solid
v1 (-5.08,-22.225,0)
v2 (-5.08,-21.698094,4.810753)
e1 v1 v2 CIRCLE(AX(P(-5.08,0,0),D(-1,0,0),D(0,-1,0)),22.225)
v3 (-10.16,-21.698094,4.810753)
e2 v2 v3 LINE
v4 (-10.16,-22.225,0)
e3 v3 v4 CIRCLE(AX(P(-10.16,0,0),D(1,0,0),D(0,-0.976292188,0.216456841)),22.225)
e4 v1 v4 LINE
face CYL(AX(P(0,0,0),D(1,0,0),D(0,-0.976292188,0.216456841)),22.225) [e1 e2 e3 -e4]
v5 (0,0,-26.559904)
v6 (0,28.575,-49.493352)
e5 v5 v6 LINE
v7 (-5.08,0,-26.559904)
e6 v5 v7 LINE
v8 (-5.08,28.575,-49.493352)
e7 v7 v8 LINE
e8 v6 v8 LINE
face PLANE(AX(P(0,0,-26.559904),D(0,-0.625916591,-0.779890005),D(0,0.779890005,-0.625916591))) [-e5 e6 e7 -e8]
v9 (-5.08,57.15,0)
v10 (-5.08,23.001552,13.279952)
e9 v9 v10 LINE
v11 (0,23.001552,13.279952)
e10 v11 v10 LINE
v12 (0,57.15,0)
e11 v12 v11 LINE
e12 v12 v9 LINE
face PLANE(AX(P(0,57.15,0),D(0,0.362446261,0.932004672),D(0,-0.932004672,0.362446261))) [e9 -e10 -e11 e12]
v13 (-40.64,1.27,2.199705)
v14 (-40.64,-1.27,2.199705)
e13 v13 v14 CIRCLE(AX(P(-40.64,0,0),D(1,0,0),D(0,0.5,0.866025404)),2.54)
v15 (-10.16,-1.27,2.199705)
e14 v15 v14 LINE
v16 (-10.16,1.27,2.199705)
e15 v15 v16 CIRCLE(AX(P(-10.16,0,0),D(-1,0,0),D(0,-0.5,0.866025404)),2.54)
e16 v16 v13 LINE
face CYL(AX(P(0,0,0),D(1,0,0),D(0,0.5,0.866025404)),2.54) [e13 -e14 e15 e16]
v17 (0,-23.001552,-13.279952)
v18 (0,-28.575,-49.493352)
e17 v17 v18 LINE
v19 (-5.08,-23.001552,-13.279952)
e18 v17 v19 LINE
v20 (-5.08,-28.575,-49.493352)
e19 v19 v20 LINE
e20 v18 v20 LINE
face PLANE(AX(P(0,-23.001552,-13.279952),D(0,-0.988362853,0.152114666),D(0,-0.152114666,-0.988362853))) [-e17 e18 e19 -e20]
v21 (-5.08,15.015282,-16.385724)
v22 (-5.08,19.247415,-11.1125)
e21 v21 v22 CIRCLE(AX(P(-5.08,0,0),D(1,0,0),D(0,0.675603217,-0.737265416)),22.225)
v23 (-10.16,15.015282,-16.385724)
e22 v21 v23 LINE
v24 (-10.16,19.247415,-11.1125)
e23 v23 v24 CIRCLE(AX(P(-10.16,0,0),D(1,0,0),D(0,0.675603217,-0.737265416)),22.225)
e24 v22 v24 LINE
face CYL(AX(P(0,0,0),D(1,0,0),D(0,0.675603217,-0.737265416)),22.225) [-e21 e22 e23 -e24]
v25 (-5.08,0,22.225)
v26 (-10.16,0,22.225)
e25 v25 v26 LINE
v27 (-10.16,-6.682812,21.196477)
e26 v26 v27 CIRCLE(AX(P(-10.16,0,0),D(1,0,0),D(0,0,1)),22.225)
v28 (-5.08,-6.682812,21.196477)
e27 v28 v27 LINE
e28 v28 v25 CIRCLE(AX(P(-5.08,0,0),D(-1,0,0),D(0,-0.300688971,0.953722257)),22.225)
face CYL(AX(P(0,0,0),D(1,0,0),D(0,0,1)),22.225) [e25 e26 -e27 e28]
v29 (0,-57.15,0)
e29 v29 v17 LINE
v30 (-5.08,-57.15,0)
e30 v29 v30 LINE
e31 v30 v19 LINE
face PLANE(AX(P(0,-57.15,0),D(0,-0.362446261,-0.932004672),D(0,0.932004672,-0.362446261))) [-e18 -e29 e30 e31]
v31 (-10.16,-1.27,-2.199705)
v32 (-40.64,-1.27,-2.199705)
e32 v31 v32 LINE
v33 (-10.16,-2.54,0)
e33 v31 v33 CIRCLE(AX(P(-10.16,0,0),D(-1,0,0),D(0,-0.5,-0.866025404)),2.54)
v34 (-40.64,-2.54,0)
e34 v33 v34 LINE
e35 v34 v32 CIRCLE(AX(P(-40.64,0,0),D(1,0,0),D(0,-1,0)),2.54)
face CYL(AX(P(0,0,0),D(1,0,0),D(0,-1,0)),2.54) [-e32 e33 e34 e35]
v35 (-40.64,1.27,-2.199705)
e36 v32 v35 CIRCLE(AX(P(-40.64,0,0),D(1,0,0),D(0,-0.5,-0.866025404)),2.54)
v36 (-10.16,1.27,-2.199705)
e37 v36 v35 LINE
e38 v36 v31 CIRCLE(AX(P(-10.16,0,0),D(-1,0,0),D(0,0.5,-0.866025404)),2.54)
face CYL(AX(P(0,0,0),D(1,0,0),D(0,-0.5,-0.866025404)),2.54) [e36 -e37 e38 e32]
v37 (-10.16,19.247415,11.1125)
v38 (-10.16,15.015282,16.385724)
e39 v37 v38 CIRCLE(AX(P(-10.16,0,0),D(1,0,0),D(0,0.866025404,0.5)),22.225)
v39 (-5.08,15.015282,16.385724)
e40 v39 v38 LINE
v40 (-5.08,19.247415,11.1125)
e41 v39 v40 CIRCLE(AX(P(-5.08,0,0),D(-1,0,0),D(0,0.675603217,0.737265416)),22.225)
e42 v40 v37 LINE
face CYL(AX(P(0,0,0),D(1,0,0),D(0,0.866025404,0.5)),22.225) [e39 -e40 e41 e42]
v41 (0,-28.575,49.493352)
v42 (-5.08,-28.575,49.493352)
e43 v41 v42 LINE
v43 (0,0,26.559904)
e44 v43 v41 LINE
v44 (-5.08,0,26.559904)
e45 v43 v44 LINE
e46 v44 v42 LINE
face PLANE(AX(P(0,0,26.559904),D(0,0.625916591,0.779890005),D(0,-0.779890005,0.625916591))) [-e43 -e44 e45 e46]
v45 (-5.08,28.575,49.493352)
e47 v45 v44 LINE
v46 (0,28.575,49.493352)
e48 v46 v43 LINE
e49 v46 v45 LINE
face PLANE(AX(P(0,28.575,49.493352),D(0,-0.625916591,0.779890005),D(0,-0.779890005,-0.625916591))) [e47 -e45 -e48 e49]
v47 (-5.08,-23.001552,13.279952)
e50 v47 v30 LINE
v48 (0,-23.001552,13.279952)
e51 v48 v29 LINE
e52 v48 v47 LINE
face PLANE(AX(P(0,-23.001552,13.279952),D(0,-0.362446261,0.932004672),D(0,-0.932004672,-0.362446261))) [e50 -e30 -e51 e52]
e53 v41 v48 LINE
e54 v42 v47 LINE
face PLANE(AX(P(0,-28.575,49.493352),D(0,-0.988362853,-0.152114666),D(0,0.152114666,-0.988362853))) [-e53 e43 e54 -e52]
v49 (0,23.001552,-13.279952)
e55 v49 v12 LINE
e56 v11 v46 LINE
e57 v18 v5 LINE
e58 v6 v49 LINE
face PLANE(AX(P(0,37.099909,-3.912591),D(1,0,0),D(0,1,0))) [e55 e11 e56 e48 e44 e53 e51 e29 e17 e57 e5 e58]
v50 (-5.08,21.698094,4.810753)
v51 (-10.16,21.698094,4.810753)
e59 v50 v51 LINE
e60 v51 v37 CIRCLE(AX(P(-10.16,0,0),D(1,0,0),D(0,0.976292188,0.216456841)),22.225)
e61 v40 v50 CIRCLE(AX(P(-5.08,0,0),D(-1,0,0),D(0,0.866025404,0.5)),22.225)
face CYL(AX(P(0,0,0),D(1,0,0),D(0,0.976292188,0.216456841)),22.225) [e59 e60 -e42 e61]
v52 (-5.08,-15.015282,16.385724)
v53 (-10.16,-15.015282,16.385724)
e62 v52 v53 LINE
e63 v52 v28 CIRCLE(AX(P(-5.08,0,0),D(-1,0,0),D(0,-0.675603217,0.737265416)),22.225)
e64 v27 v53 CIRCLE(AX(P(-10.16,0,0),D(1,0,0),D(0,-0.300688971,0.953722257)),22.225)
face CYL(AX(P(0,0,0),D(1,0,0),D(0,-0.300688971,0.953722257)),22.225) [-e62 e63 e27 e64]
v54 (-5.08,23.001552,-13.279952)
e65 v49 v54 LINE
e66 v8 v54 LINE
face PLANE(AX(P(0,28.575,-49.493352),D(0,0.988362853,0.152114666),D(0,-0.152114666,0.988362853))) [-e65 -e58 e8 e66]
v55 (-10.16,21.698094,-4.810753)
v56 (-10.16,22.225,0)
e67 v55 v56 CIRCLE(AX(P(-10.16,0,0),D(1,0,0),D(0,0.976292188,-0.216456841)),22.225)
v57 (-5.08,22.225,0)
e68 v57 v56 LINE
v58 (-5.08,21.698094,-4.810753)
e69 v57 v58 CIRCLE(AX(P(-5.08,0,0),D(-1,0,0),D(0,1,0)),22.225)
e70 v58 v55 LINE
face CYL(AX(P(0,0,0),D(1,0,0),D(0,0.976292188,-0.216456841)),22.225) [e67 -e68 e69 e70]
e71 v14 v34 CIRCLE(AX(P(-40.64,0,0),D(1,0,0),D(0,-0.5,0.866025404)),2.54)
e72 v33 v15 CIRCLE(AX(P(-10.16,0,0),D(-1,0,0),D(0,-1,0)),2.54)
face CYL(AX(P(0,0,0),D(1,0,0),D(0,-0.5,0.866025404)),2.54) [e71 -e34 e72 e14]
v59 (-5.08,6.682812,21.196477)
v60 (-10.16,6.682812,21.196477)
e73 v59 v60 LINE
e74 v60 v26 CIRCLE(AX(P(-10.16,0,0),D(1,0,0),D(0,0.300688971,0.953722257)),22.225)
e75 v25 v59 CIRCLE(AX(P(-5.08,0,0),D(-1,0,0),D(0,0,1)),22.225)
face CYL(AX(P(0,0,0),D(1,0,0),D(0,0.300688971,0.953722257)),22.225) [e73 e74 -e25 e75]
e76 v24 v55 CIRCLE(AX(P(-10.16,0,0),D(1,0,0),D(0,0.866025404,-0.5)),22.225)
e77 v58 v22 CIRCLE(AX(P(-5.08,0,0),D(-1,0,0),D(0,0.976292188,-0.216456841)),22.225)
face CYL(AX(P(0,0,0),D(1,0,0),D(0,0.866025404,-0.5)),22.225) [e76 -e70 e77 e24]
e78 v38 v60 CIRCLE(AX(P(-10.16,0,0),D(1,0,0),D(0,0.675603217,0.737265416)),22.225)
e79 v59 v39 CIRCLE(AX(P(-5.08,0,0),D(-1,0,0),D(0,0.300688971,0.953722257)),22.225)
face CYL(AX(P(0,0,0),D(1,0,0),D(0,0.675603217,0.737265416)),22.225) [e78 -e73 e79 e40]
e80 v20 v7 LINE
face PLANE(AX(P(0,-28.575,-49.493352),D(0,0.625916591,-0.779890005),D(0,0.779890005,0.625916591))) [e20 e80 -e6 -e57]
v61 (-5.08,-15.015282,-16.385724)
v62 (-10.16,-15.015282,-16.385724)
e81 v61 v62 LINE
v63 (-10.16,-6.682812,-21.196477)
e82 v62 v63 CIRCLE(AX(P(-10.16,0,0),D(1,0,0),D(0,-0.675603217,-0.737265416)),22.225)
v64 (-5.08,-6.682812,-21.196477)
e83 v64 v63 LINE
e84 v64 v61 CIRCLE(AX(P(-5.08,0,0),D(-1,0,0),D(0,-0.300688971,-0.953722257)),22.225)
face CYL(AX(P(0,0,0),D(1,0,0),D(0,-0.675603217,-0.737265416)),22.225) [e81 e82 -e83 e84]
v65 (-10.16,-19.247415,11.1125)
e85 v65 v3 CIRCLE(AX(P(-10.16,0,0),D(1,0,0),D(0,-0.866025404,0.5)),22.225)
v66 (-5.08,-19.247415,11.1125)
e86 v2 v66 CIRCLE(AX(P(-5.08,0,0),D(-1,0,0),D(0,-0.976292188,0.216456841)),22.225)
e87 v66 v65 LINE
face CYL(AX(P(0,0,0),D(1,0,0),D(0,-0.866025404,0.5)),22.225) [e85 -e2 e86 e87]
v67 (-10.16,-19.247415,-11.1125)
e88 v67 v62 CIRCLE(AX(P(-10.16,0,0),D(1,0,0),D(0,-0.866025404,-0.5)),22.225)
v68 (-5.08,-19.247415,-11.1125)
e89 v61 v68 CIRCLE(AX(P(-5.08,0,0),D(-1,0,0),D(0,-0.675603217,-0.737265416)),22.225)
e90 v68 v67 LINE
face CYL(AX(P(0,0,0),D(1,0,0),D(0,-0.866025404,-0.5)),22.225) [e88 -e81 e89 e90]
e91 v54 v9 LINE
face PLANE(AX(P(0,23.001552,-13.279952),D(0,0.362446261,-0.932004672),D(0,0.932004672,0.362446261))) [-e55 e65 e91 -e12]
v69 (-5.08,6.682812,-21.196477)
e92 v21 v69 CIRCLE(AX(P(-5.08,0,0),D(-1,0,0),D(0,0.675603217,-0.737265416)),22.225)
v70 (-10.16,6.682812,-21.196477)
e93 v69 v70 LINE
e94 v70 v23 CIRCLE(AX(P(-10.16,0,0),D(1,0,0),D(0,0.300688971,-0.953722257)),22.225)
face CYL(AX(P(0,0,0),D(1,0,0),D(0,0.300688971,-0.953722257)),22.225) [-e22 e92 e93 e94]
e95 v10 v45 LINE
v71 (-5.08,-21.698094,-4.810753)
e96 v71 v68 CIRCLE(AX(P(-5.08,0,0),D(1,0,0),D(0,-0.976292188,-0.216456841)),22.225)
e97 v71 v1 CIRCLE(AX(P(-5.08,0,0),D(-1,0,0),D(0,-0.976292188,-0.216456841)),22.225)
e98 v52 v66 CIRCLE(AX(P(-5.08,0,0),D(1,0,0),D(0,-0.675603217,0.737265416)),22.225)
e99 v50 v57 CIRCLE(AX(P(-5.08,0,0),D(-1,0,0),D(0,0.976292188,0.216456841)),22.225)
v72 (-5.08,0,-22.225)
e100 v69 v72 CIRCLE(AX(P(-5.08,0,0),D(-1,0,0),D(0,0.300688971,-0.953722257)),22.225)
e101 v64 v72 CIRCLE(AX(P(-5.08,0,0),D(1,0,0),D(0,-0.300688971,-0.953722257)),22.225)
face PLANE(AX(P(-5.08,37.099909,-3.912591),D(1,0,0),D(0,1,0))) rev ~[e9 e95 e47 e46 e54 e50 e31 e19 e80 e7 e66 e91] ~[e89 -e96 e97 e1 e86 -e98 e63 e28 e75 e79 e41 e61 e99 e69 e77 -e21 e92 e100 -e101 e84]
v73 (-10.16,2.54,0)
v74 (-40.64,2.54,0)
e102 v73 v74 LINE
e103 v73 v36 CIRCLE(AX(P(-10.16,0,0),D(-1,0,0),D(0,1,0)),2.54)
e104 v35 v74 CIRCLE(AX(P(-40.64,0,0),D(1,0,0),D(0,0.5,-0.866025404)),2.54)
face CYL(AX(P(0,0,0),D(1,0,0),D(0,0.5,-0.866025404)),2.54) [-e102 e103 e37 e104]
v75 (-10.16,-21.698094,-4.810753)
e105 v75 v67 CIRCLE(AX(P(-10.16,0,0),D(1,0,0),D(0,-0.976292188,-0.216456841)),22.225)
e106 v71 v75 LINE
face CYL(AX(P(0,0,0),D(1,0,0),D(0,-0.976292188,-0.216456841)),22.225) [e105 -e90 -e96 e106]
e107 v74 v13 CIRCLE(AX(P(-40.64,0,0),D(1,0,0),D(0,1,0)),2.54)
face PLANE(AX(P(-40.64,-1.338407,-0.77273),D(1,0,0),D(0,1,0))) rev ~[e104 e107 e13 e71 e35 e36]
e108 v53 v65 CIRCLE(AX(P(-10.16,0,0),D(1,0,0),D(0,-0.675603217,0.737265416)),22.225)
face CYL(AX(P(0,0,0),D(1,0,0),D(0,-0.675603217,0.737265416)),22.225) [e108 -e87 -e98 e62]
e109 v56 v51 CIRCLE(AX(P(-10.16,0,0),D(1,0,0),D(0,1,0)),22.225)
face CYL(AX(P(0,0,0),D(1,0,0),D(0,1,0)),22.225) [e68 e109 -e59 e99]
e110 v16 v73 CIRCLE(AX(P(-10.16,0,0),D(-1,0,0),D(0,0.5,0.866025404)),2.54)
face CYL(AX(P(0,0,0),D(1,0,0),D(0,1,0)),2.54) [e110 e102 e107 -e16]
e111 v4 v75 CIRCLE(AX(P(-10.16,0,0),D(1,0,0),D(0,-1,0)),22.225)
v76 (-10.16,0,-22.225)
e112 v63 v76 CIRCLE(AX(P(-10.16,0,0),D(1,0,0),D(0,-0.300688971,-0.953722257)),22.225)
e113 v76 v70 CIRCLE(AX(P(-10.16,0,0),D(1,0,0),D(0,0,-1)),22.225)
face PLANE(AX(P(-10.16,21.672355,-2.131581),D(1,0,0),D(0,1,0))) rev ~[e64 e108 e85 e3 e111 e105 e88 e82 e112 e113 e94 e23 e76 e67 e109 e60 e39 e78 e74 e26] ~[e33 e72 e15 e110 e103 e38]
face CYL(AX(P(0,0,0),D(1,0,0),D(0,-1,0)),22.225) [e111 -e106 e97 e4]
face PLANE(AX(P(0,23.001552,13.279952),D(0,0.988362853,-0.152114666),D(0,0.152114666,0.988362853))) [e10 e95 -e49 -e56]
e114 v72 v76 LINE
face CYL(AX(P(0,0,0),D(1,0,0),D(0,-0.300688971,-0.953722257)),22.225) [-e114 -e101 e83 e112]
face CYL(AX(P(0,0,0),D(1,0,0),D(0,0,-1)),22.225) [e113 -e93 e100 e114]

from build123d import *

# Parameters (mm, degrees)
F1_DEPTH = 40.64
F2_DEPTH = 10.16
F3_DEPTH = 5.08


with BuildPart() as f1:
    # F0 (on Right) → F1 (new body)
    with BuildSketch(Plane.YZ):
        with BuildLine():
            Line((-1.27, -2.1997045256), (0, 0))
            Line((0, 0), (-2.54, 0))
            ThreePointArc((-2.54, 0), (-2.1997045256, -1.27), (-1.27, -2.1997045256))
        make_face()
        with BuildLine():
            Line((1.27, -2.1997045256), (0, 0))
            Line((0, 0), (-1.27, -2.1997045256))
            ThreePointArc((-1.27, -2.1997045256), (0, -2.54), (1.27, -2.1997045256))
        make_face()
        with BuildLine():
            ThreePointArc((1.27, -2.1997045256), (2.1997045256, -1.27), (2.54, 0))
            Line((2.54, 0), (0, 0))
            Line((0, 0), (1.27, -2.1997045256))
        make_face()
        with BuildLine():
            Line((0, 0), (2.54, 0))
            ThreePointArc((2.54, 0), (2.1997045256, 1.27), (1.27, 2.1997045256))
            Line((1.27, 2.1997045256), (0, 0))
        make_face()
        with BuildLine():
            Line((-1.27, 2.1997045256), (0, 0))
            Line((0, 0), (1.27, 2.1997045256))
            ThreePointArc((1.27, 2.1997045256), (0, 2.54), (-1.27, 2.1997045256))
        make_face()
        with BuildLine():
            Line((-2.54, 0), (0, 0))
            Line((0, 0), (-1.27, 2.1997045256))
            ThreePointArc((-1.27, 2.1997045256), (-2.1997045256, 1.27), (-2.54, 0))
        make_face()
    extrude(amount=-F1_DEPTH)

    # F0 (on Right) → F2 (join)
    with BuildSketch(Plane.YZ):
        with BuildLine():
            ThreePointArc((21.6980938733, -4.8107532948), (22.0928807689, -2.419761214), (22.225, 0))
            Line((22.225, 0), (20.9576915714, 0))
            Line((20.9576915714, 0), (21.6980938733, -4.8107532948))
        make_face()
        with BuildLine():
            Line((20.9576915714, 0), (22.225, 0))
            ThreePointArc((22.225, 0), (22.0928807689, 2.4197612139), (21.6980938733, 4.8107532948))
            Line((21.6980938733, 4.8107532948), (20.9576915714, 0))
        make_face()
        with BuildLine():
            Line((19.2474145991, -11.1125), (20.9576915714, 0))
            Line((20.9576915714, 0), (2.54, 0))
            ThreePointArc((2.54, 0), (2.1997045256, -1.27), (1.27, -2.1997045256))
            Line((1.27, -2.1997045256), (10.4788457857, -18.1498933056))
            Line((10.4788457857, -18.1498933056), (19.2474145991, -11.1125))
        make_face()
        with BuildLine():
            Line((2.54, 0), (20.9576915714, 0))
            Line((20.9576915714, 0), (19.2474145991, 11.1125))
            Line((19.2474145991, 11.1125), (10.4788457857, 18.1498933056))
            Line((10.4788457857, 18.1498933056), (1.27, 2.1997045256))
            ThreePointArc((1.27, 2.1997045256), (2.1997045256, 1.27), (2.54, 0))
        make_face()
        with BuildLine():
            Line((19.2474145991, 11.1125), (20.9576915714, 0))
            Line((20.9576915714, 0), (21.6980938733, 4.8107532948))
            ThreePointArc((21.6980938733, 4.8107532948), (20.713803825, 8.0553681542), (19.2474145991, 11.1125))
        make_face()
        with BuildLine():
            Line((21.6980938733, -4.8107532948), (20.9576915714, 0))
            Line((20.9576915714, 0), (19.2474145991, -11.1125))
            ThreePointArc((19.2474145991, -11.1125), (20.713803825, -8.0553681542), (21.6980938733, -4.8107532948))
        make_face()
        with BuildLine():
            Line((10.4788457857, 18.1498933056), (11.1125, 19.2474145991))
            ThreePointArc((11.1125, 19.2474145991), (8.9508657021, 20.3428765956), (6.682812372, 21.1964771554))
            Line((6.682812372, 21.1964771554), (10.4788457857, 18.1498933056))
        make_face()
        with BuildLine():
            ThreePointArc((15.0152815013, 16.3857238606), (13.1420150668, 17.9231153816), (11.1125, 19.2474145991))
            Line((11.1125, 19.2474145991), (10.4788457857, 18.1498933056))
            Line((10.4788457857, 18.1498933056), (15.0152815013, 16.3857238606))
        make_face()
        with BuildLine():
            Line((10.4788457857, -18.1498933056), (11.1125, -19.2474145991))
            ThreePointArc((11.1125, -19.2474145991), (13.1420150668, -17.9231153816), (15.0152815013, -16.3857238606))
            Line((15.0152815013, -16.3857238606), (10.4788457857, -18.1498933056))
        make_face()
        with BuildLine():
            ThreePointArc((6.682812372, -21.1964771554), (8.9508657021, -20.3428765956), (11.1125, -19.2474145991))
            Line((11.1125, -19.2474145991), (10.4788457857, -18.1498933056))
            Line((10.4788457857, -18.1498933056), (6.682812372, -21.1964771554))
        make_face()
        with BuildLine():
            ThreePointArc((19.2474145991, 11.1125), (17.3330553708, 13.9109962444), (15.0152815013, 16.3857238606))
            Line((15.0152815013, 16.3857238606), (10.4788457857, 18.1498933056))
            Line((10.4788457857, 18.1498933056), (19.2474145991, 11.1125))
        make_face()
        with BuildLine():
            Line((10.4788457857, -18.1498933056), (15.0152815013, -16.3857238606))
            ThreePointArc((15.0152815013, -16.3857238606), (17.3330553708, -13.9109962444), (19.2474145991, -11.1125))
            Line((19.2474145991, -11.1125), (10.4788457857, -18.1498933056))
        make_face()
        with BuildLine():
            Line((-10.4788457857, 18.1498933056), (-11.1125, 19.2474145991))
            ThreePointArc((-11.1125, 19.2474145991), (-13.1420150668, 17.9231153816), (-15.0152815013, 16.3857238606))
            Line((-15.0152815013, 16.3857238606), (-10.4788457857, 18.1498933056))
        make_face()
        with BuildLine():
            ThreePointArc((-6.682812372, 21.1964771554), (-8.9508657021, 20.3428765956), (-11.1125, 19.2474145991))
            Line((-11.1125, 19.2474145991), (-10.4788457857, 18.1498933056))
            Line((-10.4788457857, 18.1498933056), (-6.682812372, 21.1964771554))
        make_face()
        with BuildLine():
            Line((10.4788457857, 18.1498933056), (6.682812372, 21.1964771554))
            ThreePointArc((6.682812372, 21.1964771554), (3.3807484542, 21.9663643985), (0, 22.225))
            Line((0, 22.225), (10.4788457857, 18.1498933056))
        make_face()
        with BuildLine():
            ThreePointArc((0, 22.225), (-3.3807484542, 21.9663643985), (-6.682812372, 21.1964771554))
            Line((-6.682812372, 21.1964771554), (-10.4788457857, 18.1498933056))
            Line((-10.4788457857, 18.1498933056), (0, 22.225))
        make_face()
        with BuildLine():
            Line((1.27, 2.1997045256), (10.4788457857, 18.1498933056))
            Line((10.4788457857, 18.1498933056), (0, 22.225))
            Line((0, 22.225), (-10.4788457857, 18.1498933056))
            Line((-10.4788457857, 18.1498933056), (-1.27, 2.1997045256))
            ThreePointArc((-1.27, 2.1997045256), (0, 2.54), (1.27, 2.1997045256))
        make_face()
        with BuildLine():
            Line((-10.4788457857, -18.1498933056), (-11.1125, -19.2474145991))
            ThreePointArc((-11.1125, -19.2474145991), (-8.9508657021, -20.3428765956), (-6.682812372, -21.1964771554))
            Line((-6.682812372, -21.1964771554), (-10.4788457857, -18.1498933056))
        make_face()
        with BuildLine():
            ThreePointArc((-15.0152815013, -16.3857238606), (-13.1420150668, -17.9231153816), (-11.1125, -19.2474145991))
            Line((-11.1125, -19.2474145991), (-10.4788457857, -18.1498933056))
            Line((-10.4788457857, -18.1498933056), (-15.0152815013, -16.3857238606))
        make_face()
        with BuildLine():
            Line((-10.4788457857, -18.1498933056), (-6.682812372, -21.1964771554))
            ThreePointArc((-6.682812372, -21.1964771554), (-3.3807484542, -21.9663643985), (0, -22.225))
            Line((0, -22.225), (-10.4788457857, -18.1498933056))
        make_face()
        with BuildLine():
            ThreePointArc((0, -22.225), (3.3807484542, -21.9663643985), (6.682812372, -21.1964771554))
            Line((6.682812372, -21.1964771554), (10.4788457857, -18.1498933056))
            Line((10.4788457857, -18.1498933056), (0, -22.225))
        make_face()
        with BuildLine():
            Line((0, -22.225), (10.4788457857, -18.1498933056))
            Line((10.4788457857, -18.1498933056), (1.27, -2.1997045256))
            ThreePointArc((1.27, -2.1997045256), (0, -2.54), (-1.27, -2.1997045256))
            Line((-1.27, -2.1997045256), (-10.4788457857, -18.1498933056))
            Line((-10.4788457857, -18.1498933056), (0, -22.225))
        make_face()
        with BuildLine():
            ThreePointArc((-21.6980938733, 4.8107532948), (-22.0928807689, 2.419761214), (-22.225, 0))
            Line((-22.225, 0), (-20.9576915714, 0))
            Line((-20.9576915714, 0), (-21.6980938733, 4.8107532948))
        make_face()
        with BuildLine():
            Line((-20.9576915714, 0), (-22.225, 0))
            ThreePointArc((-22.225, 0), (-22.0928807689, -2.419761214), (-21.6980938733, -4.8107532948))
            Line((-21.6980938733, -4.8107532948), (-20.9576915714, 0))
        make_face()
        with BuildLine():
            Line((-10.4788457857, 18.1498933056), (-15.0152815013, 16.3857238606))
            ThreePointArc((-15.0152815013, 16.3857238606), (-17.3330553708, 13.9109962444), (-19.2474145991, 11.1125))
            Line((-19.2474145991, 11.1125), (-10.4788457857, 18.1498933056))
        make_face()
        with BuildLine():
            ThreePointArc((-19.2474145991, 11.1125), (-20.713803825, 8.0553681542), (-21.6980938733, 4.8107532948))
            Line((-21.6980938733, 4.8107532948), (-20.9576915714, 0))
            Line((-20.9576915714, 0), (-19.2474145991, 11.1125))
        make_face()
        with BuildLine():
            Line((-1.27, 2.1997045256), (-10.4788457857, 18.1498933056))
            Line((-10.4788457857, 18.1498933056), (-19.2474145991, 11.1125))
            Line((-19.2474145991, 11.1125), (-20.9576915714, 0))
            Line((-20.9576915714, 0), (-2.54, 0))
            ThreePointArc((-2.54, 0), (-2.1997045256, 1.27), (-1.27, 2.1997045256))
        make_face()
        with BuildLine():
            ThreePointArc((-19.2474145991, -11.1125), (-17.3330553708, -13.9109962444), (-15.0152815013, -16.3857238606))
            Line((-15.0152815013, -16.3857238606), (-10.4788457857, -18.1498933056))
            Line((-10.4788457857, -18.1498933056), (-19.2474145991, -11.1125))
        make_face()
        with BuildLine():
            Line((-20.9576915714, 0), (-21.6980938733, -4.8107532948))
            ThreePointArc((-21.6980938733, -4.8107532948), (-20.713803825, -8.0553681542), (-19.2474145991, -11.1125))
            Line((-19.2474145991, -11.1125), (-20.9576915714, 0))
        make_face()
        with BuildLine():
            Line((-19.2474145991, -11.1125), (-10.4788457857, -18.1498933056))
            Line((-10.4788457857, -18.1498933056), (-1.27, -2.1997045256))
            ThreePointArc((-1.27, -2.1997045256), (-2.1997045256, -1.27), (-2.54, 0))
            Line((-2.54, 0), (-20.9576915714, 0))
            Line((-20.9576915714, 0), (-19.2474145991, -11.1125))
        make_face()
    extrude(amount=-F2_DEPTH)

    # F0 (on Right) → F3 (join)
    with BuildSketch(Plane.YZ):
        with BuildLine():
            Line((23.0015517527, -13.2799520962), (57.15, 0))
            Line((57.15, 0), (22.225, 0))
            ThreePointArc((22.225, 0), (22.0928807689, -2.419761214), (21.6980938733, -4.8107532948))
            Line((21.6980938733, -4.8107532948), (23.0015517527, -13.2799520962))
        make_face()
        with BuildLine():
            Line((22.225, 0), (57.15, 0))
            Line((57.15, 0), (23.0015517527, 13.2799520962))
            Line((23.0015517527, 13.2799520962), (21.6980938733, 4.8107532948))
            ThreePointArc((21.6980938733, 4.8107532948), (22.0928807689, 2.4197612139), (22.225, 0))
        make_face()
        with BuildLine():
            Line((11.1125, 19.2474145991), (28.575, 49.4933518263))
            Line((28.575, 49.4933518263), (0, 26.5599041924))
            Line((0, 26.5599041924), (6.682812372, 21.1964771554))
            ThreePointArc((6.682812372, 21.1964771554), (8.9508657021, 20.3428765956), (11.1125, 19.2474145991))
        make_face()
        with BuildLine():
            Line((23.0015517527, 13.2799520962), (28.575, 49.4933518263))
            Line((28.575, 49.4933518263), (11.1125, 19.2474145991))
            ThreePointArc((11.1125, 19.2474145991), (13.1420150668, 17.9231153816), (15.0152815013, 16.3857238606))
            Line((15.0152815013, 16.3857238606), (23.0015517527, 13.2799520962))
        make_face()
        with BuildLine():
            Line((11.1125, -19.2474145991), (28.575, -49.4933518263))
            Line((28.575, -49.4933518263), (23.0015517527, -13.2799520962))
            Line((23.0015517527, -13.2799520962), (15.0152815013, -16.3857238606))
            ThreePointArc((15.0152815013, -16.3857238606), (13.1420150668, -17.9231153816), (11.1125, -19.2474145991))
        make_face()
        with BuildLine():
            Line((0, -26.5599041924), (28.575, -49.4933518263))
            Line((28.575, -49.4933518263), (11.1125, -19.2474145991))
            ThreePointArc((11.1125, -19.2474145991), (8.9508657021, -20.3428765956), (6.682812372, -21.1964771554))
            Line((6.682812372, -21.1964771554), (0, -26.5599041924))
        make_face()
        with BuildLine():
            Line((21.6980938733, 4.8107532948), (23.0015517527, 13.2799520962))
            Line((23.0015517527, 13.2799520962), (15.0152815013, 16.3857238606))
            ThreePointArc((15.0152815013, 16.3857238606), (17.3330553708, 13.9109962444), (19.2474145991, 11.1125))
            ThreePointArc((19.2474145991, 11.1125), (20.713803825, 8.0553681542), (21.6980938733, 4.8107532948))
        make_face()
        with BuildLine():
            Line((15.0152815013, -16.3857238606), (23.0015517527, -13.2799520962))
            Line((23.0015517527, -13.2799520962), (21.6980938733, -4.8107532948))
            ThreePointArc((21.6980938733, -4.8107532948), (20.713803825, -8.0553681542), (19.2474145991, -11.1125))
            ThreePointArc((19.2474145991, -11.1125), (17.3330553708, -13.9109962444), (15.0152815013, -16.3857238606))
        make_face()
        with BuildLine():
            Line((-11.1125, 19.2474145991), (-28.575, 49.4933518263))
            Line((-28.575, 49.4933518263), (-23.0015517527, 13.2799520962))
            Line((-23.0015517527, 13.2799520962), (-15.0152815013, 16.3857238606))
            ThreePointArc((-15.0152815013, 16.3857238606), (-13.1420150668, 17.9231153816), (-11.1125, 19.2474145991))
        make_face()
        with BuildLine():
            Line((0, 26.5599041924), (-28.575, 49.4933518263))
            Line((-28.575, 49.4933518263), (-11.1125, 19.2474145991))
            ThreePointArc((-11.1125, 19.2474145991), (-8.9508657021, 20.3428765956), (-6.682812372, 21.1964771554))
            Line((-6.682812372, 21.1964771554), (0, 26.5599041924))
        make_face()
        with BuildLine():
            Line((6.682812372, 21.1964771554), (0, 26.5599041924))
            Line((0, 26.5599041924), (-6.682812372, 21.1964771554))
            ThreePointArc((-6.682812372, 21.1964771554), (-3.3807484542, 21.9663643985), (0, 22.225))
            ThreePointArc((0, 22.225), (3.3807484542, 21.9663643985), (6.682812372, 21.1964771554))
        make_face()
        with BuildLine():
            Line((-11.1125, -19.2474145991), (-28.575, -49.4933518263))
            Line((-28.575, -49.4933518263), (0, -26.5599041924))
            Line((0, -26.5599041924), (-6.682812372, -21.1964771554))
            ThreePointArc((-6.682812372, -21.1964771554), (-8.9508657021, -20.3428765956), (-11.1125, -19.2474145991))
        make_face()
        with BuildLine():
            Line((-23.0015517527, -13.2799520962), (-28.575, -49.4933518263))
            Line((-28.575, -49.4933518263), (-11.1125, -19.2474145991))
            ThreePointArc((-11.1125, -19.2474145991), (-13.1420150668, -17.9231153816), (-15.0152815013, -16.3857238606))
            Line((-15.0152815013, -16.3857238606), (-23.0015517527, -13.2799520962))
        make_face()
        with BuildLine():
            Line((-6.682812372, -21.1964771554), (0, -26.5599041924))
            Line((0, -26.5599041924), (6.682812372, -21.1964771554))
            ThreePointArc((6.682812372, -21.1964771554), (3.3807484542, -21.9663643985), (0, -22.225))
            ThreePointArc((0, -22.225), (-3.3807484542, -21.9663643985), (-6.682812372, -21.1964771554))
        make_face()
        with BuildLine():
            Line((10.4788457857, -18.1498933056), (15.0152815013, -16.3857238606))
            ThreePointArc((15.0152815013, -16.3857238606), (17.3330553708, -13.9109962444), (19.2474145991, -11.1125))
            Line((19.2474145991, -11.1125), (10.4788457857, -18.1498933056))
        make_face()
        with BuildLine():
            Line((-23.0015517527, 13.2799520962), (-57.15, 0))
            Line((-57.15, 0), (-22.225, 0))
            ThreePointArc((-22.225, 0), (-22.0928807689, 2.419761214), (-21.6980938733, 4.8107532948))
            Line((-21.6980938733, 4.8107532948), (-23.0015517527, 13.2799520962))
        make_face()
        with BuildLine():
            Line((-22.225, 0), (-57.15, 0))
            Line((-57.15, 0), (-23.0015517527, -13.2799520962))
            Line((-23.0015517527, -13.2799520962), (-21.6980938733, -4.8107532948))
            ThreePointArc((-21.6980938733, -4.8107532948), (-22.0928807689, -2.419761214), (-22.225, 0))
        make_face()
        with BuildLine():
            Line((-15.0152815013, 16.3857238606), (-23.0015517527, 13.2799520962))
            Line((-23.0015517527, 13.2799520962), (-21.6980938733, 4.8107532948))
            ThreePointArc((-21.6980938733, 4.8107532948), (-20.713803825, 8.0553681542), (-19.2474145991, 11.1125))
            ThreePointArc((-19.2474145991, 11.1125), (-17.3330553708, 13.9109962444), (-15.0152815013, 16.3857238606))
        make_face()
        with BuildLine():
            Line((1.27, 2.1997045256), (10.4788457857, 18.1498933056))
            Line((10.4788457857, 18.1498933056), (0, 22.225))
            Line((0, 22.225), (-10.4788457857, 18.1498933056))
            Line((-10.4788457857, 18.1498933056), (-1.27, 2.1997045256))
            ThreePointArc((-1.27, 2.1997045256), (0, 2.54), (1.27, 2.1997045256))
        make_face()
        with BuildLine():
            Line((-21.6980938733, -4.8107532948), (-23.0015517527, -13.2799520962))
            Line((-23.0015517527, -13.2799520962), (-15.0152815013, -16.3857238606))
            ThreePointArc((-15.0152815013, -16.3857238606), (-17.3330553708, -13.9109962444), (-19.2474145991, -11.1125))
            ThreePointArc((-19.2474145991, -11.1125), (-20.713803825, -8.0553681542), (-21.6980938733, -4.8107532948))
        make_face()
        with BuildLine():
            Line((-10.4788457857, -18.1498933056), (-6.682812372, -21.1964771554))
            ThreePointArc((-6.682812372, -21.1964771554), (-3.3807484542, -21.9663643985), (0, -22.225))
            Line((0, -22.225), (-10.4788457857, -18.1498933056))
        make_face()
        with BuildLine():
            Line((0, -22.225), (10.4788457857, -18.1498933056))
            Line((10.4788457857, -18.1498933056), (1.27, -2.1997045256))
            ThreePointArc((1.27, -2.1997045256), (0, -2.54), (-1.27, -2.1997045256))
            Line((-1.27, -2.1997045256), (-10.4788457857, -18.1498933056))
            Line((-10.4788457857, -18.1498933056), (0, -22.225))
        make_face()
        with BuildLine():
            Line((-10.4788457857, 18.1498933056), (-15.0152815013, 16.3857238606))
            ThreePointArc((-15.0152815013, 16.3857238606), (-17.3330553708, 13.9109962444), (-19.2474145991, 11.1125))
            Line((-19.2474145991, 11.1125), (-10.4788457857, 18.1498933056))
        make_face()
        with BuildLine():
            Line((-20.9576915714, 0), (-21.6980938733, -4.8107532948))
            ThreePointArc((-21.6980938733, -4.8107532948), (-20.713803825, -8.0553681542), (-19.2474145991, -11.1125))
            Line((-19.2474145991, -11.1125), (-20.9576915714, 0))
        make_face()
        with BuildLine():
            Line((-19.2474145991, -11.1125), (-10.4788457857, -18.1498933056))
            Line((-10.4788457857, -18.1498933056), (-1.27, -2.1997045256))
            ThreePointArc((-1.27, -2.1997045256), (-2.1997045256, -1.27), (-2.54, 0))
            Line((-2.54, 0), (-20.9576915714, 0))
            Line((-20.9576915714, 0), (-19.2474145991, -11.1125))
        make_face()
    extrude(amount=-F3_DEPTH)


solid = f1.part
